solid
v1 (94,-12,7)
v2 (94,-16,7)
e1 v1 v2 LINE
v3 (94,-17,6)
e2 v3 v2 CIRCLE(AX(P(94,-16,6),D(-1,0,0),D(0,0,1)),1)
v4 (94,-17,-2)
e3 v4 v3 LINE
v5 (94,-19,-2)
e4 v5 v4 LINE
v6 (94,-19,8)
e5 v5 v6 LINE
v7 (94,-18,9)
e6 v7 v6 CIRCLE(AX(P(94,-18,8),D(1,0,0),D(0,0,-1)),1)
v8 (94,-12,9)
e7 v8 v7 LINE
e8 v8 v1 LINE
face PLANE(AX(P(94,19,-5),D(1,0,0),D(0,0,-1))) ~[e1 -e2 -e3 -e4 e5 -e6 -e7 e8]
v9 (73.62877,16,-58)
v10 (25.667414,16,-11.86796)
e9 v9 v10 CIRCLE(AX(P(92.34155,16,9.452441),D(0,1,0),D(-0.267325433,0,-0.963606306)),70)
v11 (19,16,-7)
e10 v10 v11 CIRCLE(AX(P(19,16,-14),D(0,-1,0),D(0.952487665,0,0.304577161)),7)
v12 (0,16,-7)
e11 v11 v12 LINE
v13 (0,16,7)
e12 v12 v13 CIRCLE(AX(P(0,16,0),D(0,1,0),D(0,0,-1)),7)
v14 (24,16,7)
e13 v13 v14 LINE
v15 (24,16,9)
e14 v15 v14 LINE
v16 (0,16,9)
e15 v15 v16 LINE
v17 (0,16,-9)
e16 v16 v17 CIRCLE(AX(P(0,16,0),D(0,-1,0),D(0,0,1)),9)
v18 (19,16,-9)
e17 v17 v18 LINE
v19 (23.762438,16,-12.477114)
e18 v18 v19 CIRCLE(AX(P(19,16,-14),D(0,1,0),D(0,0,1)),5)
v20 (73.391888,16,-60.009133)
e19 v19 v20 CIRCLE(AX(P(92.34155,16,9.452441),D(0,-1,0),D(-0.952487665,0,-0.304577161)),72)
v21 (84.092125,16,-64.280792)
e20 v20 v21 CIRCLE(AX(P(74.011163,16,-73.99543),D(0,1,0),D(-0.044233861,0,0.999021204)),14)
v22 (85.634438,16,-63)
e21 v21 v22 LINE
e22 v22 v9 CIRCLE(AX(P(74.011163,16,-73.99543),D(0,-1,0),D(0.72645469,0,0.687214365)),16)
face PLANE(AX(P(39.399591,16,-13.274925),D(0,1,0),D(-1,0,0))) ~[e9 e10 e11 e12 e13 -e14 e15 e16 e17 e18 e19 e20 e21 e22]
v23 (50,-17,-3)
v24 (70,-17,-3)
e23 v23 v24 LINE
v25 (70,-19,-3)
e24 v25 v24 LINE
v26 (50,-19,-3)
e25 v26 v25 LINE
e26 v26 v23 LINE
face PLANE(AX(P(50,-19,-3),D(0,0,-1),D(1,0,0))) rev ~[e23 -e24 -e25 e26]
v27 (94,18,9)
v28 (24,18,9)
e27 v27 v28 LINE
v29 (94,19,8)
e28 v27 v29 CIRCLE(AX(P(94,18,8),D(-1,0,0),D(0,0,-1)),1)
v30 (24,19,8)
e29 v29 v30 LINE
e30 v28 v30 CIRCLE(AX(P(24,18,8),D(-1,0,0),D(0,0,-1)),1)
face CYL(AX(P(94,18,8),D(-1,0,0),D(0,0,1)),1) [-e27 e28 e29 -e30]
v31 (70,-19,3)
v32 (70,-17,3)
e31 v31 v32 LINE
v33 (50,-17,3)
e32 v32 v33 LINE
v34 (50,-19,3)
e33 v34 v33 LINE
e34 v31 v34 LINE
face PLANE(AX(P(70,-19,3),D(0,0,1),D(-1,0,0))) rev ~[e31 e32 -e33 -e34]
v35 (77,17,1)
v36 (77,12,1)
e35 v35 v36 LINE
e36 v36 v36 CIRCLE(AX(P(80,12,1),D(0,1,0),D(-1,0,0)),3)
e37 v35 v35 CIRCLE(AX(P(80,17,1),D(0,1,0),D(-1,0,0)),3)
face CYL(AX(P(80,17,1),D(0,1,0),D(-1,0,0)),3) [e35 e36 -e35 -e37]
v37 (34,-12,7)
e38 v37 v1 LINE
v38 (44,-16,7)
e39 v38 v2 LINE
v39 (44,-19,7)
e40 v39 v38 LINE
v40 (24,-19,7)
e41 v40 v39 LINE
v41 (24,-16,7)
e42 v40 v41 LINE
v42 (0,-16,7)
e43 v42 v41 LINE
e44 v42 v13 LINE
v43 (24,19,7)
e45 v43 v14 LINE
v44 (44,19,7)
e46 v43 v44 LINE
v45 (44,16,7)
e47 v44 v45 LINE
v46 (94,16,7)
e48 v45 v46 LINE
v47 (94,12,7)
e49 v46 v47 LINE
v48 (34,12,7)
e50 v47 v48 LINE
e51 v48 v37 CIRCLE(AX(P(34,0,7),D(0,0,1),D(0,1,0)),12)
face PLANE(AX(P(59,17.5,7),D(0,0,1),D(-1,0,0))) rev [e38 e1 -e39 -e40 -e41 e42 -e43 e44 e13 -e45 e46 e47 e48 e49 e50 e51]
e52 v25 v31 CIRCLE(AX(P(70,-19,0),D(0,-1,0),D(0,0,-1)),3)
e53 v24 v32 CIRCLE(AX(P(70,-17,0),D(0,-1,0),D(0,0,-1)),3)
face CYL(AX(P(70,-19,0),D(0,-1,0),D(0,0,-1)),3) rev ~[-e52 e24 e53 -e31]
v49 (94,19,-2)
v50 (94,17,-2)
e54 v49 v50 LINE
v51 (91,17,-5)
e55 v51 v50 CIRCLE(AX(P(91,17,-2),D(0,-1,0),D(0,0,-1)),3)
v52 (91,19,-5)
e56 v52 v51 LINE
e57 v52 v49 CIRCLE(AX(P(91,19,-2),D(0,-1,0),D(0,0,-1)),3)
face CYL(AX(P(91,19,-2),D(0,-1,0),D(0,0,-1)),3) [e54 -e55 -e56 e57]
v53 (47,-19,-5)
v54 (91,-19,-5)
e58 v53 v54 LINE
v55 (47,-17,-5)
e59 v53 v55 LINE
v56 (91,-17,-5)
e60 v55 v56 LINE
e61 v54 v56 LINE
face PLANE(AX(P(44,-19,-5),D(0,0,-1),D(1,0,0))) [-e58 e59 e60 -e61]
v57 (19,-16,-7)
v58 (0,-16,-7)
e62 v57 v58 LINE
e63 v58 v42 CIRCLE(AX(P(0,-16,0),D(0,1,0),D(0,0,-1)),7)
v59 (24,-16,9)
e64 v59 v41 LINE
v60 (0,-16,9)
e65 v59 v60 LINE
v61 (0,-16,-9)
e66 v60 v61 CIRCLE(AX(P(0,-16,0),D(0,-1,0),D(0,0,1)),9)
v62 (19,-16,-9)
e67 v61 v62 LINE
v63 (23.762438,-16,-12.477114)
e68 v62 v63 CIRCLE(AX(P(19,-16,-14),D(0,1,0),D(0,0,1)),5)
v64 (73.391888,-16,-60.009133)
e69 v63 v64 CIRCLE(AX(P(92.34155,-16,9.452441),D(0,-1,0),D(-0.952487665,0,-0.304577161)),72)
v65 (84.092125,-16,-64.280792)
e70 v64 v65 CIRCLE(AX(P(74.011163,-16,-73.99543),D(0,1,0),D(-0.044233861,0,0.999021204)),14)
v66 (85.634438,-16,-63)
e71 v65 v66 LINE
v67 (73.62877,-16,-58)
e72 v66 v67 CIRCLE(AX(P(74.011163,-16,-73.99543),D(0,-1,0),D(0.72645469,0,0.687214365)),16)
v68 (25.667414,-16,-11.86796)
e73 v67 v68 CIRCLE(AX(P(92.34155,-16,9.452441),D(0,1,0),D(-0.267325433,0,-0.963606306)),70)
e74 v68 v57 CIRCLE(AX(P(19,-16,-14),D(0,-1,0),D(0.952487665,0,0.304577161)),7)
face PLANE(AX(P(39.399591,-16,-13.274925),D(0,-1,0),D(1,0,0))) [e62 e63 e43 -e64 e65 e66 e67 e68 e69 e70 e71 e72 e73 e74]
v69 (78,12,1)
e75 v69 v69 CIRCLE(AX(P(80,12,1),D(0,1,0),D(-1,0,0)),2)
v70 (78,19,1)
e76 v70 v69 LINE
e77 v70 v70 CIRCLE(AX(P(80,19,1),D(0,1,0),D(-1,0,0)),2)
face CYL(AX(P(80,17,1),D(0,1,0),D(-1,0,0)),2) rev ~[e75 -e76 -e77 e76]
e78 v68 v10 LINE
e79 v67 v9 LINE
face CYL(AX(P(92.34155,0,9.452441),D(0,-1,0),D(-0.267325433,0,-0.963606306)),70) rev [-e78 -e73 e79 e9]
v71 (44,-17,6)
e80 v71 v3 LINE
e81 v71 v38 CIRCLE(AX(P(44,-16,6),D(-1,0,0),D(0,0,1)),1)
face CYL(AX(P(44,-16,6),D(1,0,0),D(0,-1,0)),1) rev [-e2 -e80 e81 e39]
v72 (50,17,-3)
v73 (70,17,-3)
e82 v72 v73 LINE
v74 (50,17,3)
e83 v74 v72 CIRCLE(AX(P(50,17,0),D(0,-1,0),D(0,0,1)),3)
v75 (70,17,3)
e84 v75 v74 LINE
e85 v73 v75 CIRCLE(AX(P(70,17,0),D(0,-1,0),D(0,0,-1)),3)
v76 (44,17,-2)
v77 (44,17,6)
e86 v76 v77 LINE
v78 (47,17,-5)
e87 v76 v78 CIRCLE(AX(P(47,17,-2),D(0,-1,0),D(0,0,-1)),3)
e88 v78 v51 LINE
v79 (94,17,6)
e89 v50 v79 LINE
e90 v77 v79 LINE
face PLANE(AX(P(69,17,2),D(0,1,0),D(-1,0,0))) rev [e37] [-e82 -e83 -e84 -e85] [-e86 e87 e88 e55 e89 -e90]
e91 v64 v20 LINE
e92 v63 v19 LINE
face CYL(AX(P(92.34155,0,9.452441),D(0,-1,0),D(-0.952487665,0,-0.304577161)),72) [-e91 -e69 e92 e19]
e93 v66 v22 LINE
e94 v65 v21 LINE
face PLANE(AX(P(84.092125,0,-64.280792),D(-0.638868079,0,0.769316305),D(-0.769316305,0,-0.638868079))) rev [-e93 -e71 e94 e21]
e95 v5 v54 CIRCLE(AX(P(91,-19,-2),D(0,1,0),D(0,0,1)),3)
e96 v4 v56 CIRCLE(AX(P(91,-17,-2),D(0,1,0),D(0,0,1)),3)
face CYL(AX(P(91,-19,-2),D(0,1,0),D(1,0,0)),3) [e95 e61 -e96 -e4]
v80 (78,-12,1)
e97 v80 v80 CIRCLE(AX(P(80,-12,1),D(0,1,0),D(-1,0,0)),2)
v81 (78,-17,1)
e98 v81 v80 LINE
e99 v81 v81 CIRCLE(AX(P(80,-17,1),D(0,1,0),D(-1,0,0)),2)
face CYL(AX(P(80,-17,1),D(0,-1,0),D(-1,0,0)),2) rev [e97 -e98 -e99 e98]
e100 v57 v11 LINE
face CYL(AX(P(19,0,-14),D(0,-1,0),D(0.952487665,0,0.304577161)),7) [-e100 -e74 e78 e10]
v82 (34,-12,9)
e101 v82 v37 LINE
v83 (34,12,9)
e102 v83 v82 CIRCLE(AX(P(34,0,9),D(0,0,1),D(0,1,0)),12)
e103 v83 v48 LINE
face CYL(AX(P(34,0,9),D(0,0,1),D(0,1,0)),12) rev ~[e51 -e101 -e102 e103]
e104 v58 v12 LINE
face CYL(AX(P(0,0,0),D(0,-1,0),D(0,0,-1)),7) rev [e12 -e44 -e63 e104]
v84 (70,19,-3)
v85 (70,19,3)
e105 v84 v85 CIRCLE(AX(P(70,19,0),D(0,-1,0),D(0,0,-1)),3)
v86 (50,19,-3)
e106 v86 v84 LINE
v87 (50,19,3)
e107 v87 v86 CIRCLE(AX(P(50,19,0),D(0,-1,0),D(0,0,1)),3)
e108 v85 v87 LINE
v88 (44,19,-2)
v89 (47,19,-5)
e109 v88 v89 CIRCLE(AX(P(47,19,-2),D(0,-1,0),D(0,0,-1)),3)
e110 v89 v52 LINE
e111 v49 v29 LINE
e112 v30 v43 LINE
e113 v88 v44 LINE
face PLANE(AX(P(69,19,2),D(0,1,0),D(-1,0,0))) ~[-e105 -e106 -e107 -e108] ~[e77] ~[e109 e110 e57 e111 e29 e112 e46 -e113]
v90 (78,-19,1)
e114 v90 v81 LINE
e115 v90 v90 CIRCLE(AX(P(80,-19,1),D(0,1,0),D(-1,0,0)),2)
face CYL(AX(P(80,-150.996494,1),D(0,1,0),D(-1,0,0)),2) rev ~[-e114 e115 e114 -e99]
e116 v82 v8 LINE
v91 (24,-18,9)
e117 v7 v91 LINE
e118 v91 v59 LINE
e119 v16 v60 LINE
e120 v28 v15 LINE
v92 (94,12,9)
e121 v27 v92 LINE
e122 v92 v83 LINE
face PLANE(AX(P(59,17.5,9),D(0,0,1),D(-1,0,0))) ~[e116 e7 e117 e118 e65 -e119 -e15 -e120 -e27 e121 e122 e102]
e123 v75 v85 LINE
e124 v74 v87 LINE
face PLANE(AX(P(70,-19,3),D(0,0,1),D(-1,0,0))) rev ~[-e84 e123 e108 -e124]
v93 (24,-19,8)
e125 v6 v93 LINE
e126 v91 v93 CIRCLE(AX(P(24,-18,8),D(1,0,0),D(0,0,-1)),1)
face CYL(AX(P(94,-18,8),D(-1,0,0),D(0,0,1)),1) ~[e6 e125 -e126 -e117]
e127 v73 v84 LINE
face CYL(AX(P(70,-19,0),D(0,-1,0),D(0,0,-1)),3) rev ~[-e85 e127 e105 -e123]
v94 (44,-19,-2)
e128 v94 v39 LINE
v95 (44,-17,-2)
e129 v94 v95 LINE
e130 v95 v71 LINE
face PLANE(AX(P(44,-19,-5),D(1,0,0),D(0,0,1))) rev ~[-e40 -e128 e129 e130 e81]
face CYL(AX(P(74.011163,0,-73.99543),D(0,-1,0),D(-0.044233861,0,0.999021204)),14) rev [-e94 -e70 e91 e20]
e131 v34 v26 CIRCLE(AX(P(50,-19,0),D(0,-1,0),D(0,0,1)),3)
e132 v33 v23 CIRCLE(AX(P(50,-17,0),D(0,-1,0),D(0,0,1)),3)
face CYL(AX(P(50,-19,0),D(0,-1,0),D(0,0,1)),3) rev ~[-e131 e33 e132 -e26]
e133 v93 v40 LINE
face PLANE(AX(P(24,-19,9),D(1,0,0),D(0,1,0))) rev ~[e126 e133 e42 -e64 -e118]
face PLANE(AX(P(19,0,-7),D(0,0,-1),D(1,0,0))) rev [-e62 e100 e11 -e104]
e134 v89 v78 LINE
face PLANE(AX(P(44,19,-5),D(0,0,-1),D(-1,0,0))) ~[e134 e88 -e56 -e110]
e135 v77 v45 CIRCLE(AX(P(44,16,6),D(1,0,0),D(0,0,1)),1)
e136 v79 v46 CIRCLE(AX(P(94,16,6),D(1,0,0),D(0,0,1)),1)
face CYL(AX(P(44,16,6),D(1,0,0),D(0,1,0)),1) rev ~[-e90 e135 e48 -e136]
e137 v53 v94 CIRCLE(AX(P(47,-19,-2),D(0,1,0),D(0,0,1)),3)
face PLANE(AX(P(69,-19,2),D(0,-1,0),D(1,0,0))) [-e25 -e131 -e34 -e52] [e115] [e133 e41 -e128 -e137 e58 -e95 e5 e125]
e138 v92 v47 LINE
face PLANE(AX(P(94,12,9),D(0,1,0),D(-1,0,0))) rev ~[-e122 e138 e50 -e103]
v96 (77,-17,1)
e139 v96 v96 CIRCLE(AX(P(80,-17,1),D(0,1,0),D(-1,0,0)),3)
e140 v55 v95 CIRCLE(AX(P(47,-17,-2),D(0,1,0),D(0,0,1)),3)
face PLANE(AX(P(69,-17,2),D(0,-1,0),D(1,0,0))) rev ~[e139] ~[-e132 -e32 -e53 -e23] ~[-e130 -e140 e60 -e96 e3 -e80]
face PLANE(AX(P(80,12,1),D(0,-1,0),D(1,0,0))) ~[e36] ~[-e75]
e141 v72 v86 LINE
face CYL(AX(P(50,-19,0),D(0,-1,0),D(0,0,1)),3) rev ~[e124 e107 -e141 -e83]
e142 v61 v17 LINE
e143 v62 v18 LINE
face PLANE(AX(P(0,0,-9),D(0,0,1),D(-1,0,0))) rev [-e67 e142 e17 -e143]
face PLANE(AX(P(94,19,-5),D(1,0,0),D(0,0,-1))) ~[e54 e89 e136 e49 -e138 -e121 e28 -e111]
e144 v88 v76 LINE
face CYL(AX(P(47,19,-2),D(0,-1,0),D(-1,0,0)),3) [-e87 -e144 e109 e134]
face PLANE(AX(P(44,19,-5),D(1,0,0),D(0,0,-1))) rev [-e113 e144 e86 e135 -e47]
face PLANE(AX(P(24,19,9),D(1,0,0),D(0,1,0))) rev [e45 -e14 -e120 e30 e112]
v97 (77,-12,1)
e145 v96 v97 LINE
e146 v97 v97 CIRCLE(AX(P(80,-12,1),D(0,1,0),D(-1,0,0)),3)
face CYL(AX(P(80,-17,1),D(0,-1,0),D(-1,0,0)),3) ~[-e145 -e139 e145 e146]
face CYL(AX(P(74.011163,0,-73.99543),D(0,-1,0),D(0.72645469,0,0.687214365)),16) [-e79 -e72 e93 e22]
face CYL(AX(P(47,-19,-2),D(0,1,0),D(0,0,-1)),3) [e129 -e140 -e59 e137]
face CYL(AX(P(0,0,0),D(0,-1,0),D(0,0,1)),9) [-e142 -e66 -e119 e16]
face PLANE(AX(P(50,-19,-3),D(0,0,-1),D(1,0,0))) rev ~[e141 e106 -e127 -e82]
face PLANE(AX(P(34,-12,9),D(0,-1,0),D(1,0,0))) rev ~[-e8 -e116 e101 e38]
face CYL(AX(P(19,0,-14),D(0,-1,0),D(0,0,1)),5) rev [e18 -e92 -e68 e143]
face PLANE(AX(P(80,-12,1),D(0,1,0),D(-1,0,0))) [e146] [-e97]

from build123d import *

# Parameters (mm, degrees)
F1_DEPTH  = 16
F2_W      = 70
F2_H      = 3
F3_DEPTH  = 2
F4_W      = 50
F4_H      = 14
F5_DEPTH  = 2
F6_R      = 1
F9_DEPTH  = 2
F11_DEPTH = 38.001
F13_D     = 4
F14_R     = 3
F14_R_2   = 2
F15_DEPTH = 5
F16_R     = 3


# Not quite as in the source:
# - a pattern or mirror of a feature is missing from the dataset's text; its kind, count and spacing are read off the source's solid


with BuildPart() as f1:
    # F0 (on Front) → F1 (new body)
    with BuildSketch(Plane.XZ):
        with BuildLine():
            Line((94, 9), (0, 9))
            ThreePointArc((0, 9), (-9, 0), (0, -9))
            Line((0, -9), (19, -9))
            ThreePointArc((19, -9), (21.9483530121, -9.9617807742), (23.7624383273, -12.4771141937))
            ThreePointArc((23.7624383273, -12.4771141937), (42.5404984663, -42.5461666629), (73.3918884835, -60.0091329916))
            ThreePointArc((73.3918884835, -60.0091329916), (79.2017940664, -60.9932244785), (84.0921252778, -64.2807919045))
            Line((84.0921252778, -64.2807919045), (85.6344375761, -63))
            ThreePointArc((85.6344375761, -63), (80.1625330731, -59.2251678092), (73.628769931, -58))
            ThreePointArc((73.628769931, -58), (43.8155502437, -40.9978046119), (25.6674136582, -11.8679598712))
            ThreePointArc((25.6674136582, -11.8679598712), (23.127694217, -8.3464930839), (19, -7))
            Line((19, -7), (0, -7))
            ThreePointArc((0, -7), (-7, 0), (0, 7))
            Line((0, 7), (94, 7))
            Line((94, 7), (94, 9))
        make_face()
    extrude(amount=F1_DEPTH)

    # F2 (on face) → F3 (join)
    with BuildSketch(Plane.XY.offset(9)):
        with Locations((59, -17.5)):
            Rectangle(F2_W, F2_H)
    extrude(amount=-F3_DEPTH)

    # F4 (on face) → F5 (join)
    with BuildSketch(Plane.XZ.offset(19)):
        with Locations((69, 2)):
            Rectangle(F4_W, F4_H)
    extrude(amount=-F5_DEPTH)

    # F6
    f6_edges = [f1.edges().sort_by_distance(p)[0] for p in [
        (69, -17, 7),
        (59, -19, 9),
    ]]
    fillet(f6_edges, radius=F6_R)

    # F7: F1 across plane


with BuildPart() as f1_1:
    add(f1.part)
    add(f1.part.mirror(Plane.XZ))

    # F8 (on face) → F9 (cut)
    with BuildSketch(Plane.XY.offset(9)):
        with BuildLine():
            Line((94, 12), (34, 12))
            ThreePointArc((34, 12), (22, 0), (34, -12))
            Line((34, -12), (94, -12))
            Line((94, -12), (94, 12))
        make_face()
    extrude(amount=-F9_DEPTH, mode=Mode.SUBTRACT)

    # F10 (on face) → F11 (cut, through all)
    with BuildSketch(Plane.XZ.offset(19)):
        with BuildLine():
            ThreePointArc((50, 3), (47, 0), (50, -3))
            Line((50, -3), (70, -3))
            ThreePointArc((70, -3), (73, 0), (70, 3))
            Line((70, 3), (50, 3))
        make_face()
    extrude(amount=-F11_DEPTH, mode=Mode.SUBTRACT)

    # F13 (through all)
    with Locations(Plane.XZ.offset(19)):
        with Locations((80, 1)):
            Hole(F13_D / 2)

    # F14 (on face) → F15 (join)
    with BuildSketch(Plane(origin=(0, -17, 0), x_dir=(-1, 0, 0), z_dir=(0, 1, 0))):
        with Locations((-80, 1)):
            Circle(F14_R)
        with Locations((-80, 1)):
            Circle(F14_R_2, mode=Mode.SUBTRACT)
    f15 = extrude(amount=F15_DEPTH)

    # F15_copies: F15 across plane
    add(f15.mirror(Plane.ZX))

    # F16
    f16_edges = [f1_1.edges().sort_by_distance(p)[0] for p in [
        (94, -18, -5),
        (94, 18, -5),
        (44, 18, -5),
        (44, -18, -5),
    ]]
    fillet(f16_edges, radius=F16_R)


solid = f1_1.part
